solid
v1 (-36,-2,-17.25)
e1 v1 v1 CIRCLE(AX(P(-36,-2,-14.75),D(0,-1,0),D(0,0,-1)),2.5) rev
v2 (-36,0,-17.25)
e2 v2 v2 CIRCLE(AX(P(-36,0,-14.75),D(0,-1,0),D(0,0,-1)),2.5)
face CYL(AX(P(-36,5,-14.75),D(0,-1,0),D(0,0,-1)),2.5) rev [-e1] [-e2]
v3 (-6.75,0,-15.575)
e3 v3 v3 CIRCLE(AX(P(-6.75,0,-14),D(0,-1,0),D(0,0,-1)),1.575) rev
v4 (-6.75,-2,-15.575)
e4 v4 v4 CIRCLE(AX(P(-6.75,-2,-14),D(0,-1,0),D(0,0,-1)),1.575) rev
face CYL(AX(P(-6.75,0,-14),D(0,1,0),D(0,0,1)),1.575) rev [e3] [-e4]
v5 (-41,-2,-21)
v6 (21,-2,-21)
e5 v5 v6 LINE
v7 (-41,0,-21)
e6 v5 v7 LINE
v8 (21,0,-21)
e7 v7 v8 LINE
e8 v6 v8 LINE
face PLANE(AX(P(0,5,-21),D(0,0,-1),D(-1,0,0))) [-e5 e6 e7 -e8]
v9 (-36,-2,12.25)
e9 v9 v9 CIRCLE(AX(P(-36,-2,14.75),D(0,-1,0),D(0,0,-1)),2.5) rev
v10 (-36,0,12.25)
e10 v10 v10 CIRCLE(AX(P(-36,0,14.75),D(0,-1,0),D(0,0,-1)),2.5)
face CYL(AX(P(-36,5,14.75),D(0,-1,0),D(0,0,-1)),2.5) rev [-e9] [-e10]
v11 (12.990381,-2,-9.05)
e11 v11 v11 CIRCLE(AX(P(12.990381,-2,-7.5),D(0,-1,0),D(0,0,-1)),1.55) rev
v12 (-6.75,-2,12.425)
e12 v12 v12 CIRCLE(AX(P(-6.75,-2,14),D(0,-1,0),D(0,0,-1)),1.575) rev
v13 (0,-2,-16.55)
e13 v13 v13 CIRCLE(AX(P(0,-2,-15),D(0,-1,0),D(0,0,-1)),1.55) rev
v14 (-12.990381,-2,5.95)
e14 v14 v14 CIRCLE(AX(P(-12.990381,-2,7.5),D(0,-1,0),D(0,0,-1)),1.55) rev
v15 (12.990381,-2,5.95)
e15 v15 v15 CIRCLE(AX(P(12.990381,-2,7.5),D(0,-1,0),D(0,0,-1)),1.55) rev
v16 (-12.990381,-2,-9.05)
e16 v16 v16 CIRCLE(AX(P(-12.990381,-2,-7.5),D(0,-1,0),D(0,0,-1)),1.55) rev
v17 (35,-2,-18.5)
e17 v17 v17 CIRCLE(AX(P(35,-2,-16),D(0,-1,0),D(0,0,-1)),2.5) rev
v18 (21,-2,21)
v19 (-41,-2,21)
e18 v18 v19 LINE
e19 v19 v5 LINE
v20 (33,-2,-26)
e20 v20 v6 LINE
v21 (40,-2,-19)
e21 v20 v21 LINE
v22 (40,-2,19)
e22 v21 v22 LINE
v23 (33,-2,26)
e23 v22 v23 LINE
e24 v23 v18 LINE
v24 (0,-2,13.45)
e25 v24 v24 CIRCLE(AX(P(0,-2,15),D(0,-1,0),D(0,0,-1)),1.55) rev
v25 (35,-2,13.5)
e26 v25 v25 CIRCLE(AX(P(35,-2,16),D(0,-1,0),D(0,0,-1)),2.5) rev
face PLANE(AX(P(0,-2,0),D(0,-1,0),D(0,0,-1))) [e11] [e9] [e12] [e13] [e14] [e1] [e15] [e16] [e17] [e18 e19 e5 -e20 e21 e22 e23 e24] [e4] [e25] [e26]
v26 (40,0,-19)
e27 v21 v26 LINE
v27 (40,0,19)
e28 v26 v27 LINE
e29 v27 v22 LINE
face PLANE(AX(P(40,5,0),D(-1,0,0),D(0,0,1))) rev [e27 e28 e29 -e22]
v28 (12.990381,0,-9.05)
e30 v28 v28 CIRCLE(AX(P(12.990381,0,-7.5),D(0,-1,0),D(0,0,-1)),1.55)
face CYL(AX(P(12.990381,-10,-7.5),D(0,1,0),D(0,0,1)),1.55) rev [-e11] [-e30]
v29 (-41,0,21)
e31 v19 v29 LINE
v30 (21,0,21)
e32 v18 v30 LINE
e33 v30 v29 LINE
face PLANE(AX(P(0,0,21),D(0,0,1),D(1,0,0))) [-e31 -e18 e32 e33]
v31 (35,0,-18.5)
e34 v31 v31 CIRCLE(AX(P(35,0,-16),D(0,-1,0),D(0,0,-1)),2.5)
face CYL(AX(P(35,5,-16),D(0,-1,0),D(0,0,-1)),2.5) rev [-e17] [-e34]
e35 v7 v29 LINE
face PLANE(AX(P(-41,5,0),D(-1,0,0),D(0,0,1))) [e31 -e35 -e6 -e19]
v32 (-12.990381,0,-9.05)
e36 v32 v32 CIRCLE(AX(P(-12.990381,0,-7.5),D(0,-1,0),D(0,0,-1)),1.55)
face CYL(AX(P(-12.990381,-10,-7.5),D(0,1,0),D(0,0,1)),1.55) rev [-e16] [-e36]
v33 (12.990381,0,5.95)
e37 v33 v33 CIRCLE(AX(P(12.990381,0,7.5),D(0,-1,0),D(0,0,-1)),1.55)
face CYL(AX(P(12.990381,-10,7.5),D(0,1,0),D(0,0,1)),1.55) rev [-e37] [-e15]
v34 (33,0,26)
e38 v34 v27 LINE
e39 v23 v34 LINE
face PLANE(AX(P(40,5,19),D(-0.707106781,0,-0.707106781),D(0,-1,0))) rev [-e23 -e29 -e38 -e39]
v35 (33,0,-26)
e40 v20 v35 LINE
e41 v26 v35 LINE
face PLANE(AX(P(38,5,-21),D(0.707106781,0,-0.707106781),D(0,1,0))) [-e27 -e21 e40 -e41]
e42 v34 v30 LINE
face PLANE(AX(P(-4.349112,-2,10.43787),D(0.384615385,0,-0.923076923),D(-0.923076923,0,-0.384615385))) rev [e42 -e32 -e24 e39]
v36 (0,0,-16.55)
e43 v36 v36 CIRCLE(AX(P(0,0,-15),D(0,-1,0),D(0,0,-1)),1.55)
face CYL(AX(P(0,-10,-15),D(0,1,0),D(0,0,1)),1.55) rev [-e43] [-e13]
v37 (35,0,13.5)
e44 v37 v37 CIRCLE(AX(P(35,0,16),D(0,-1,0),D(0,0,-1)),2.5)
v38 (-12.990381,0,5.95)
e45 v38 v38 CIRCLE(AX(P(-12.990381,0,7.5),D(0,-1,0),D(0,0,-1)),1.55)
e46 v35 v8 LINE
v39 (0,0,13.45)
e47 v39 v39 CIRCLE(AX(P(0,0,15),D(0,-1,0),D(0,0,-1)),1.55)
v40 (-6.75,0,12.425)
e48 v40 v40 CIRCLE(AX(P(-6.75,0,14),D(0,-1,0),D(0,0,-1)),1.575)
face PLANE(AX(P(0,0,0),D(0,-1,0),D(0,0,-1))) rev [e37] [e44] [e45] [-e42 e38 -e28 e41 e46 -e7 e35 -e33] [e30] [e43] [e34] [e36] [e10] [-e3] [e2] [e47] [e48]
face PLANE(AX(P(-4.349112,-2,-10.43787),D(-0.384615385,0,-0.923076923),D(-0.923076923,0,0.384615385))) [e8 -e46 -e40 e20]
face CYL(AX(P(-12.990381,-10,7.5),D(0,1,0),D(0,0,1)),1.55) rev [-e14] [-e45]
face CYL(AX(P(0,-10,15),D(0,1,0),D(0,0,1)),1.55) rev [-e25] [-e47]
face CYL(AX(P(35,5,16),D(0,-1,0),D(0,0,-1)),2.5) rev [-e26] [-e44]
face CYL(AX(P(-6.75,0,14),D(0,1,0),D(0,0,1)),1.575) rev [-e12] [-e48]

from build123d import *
from build123d.topology import SkipClean

# Parameters (mm, degrees)
SKETCH_1_R          = 25
SKETCH_1_W          = 81
SKETCH_1_H          = 42
SKETCH_1_R_2        = 2.5
EXTRUDE_1_DEPTH     = 5
SKETCH_3_W          = 8.1
SKETCH_3_H          = 6.6
SKETCH_3_R          = 1.575
CUT_EXTRUDE_1_DEPTH = 2
SKETCH_3_2_R        = 1.575
CUT_EXTRUDE_2_DEPTH = 49.280430818
SKETCH_4_W          = 8
SKETCH_4_H          = 2.9
EXTRUDE_2_DEPTH     = 42
SKETCH_1_3_R        = 2.5
CUT_EXTRUDE_3_DEPTH = 42
EXTRUDE_START       = 21
SKETCH_5_W          = 11
SKETCH_5_H          = 2.9
EXTRUDE_3_DEPTH     = 5
SKETCH_5_W_2        = 12
EXTRUDE_3_2_DEPTH   = 5
CUT_EXTRUDE_4_REACH = 87.138
CHAMFER_1_SIZE      = 2
EXTRUDE_4_DEPTH     = 15
EXTRUDE_4_2_DEPTH   = 15
EXTRUDE_START_2     = -15
EXTRUDE_5_DEPTH     = 7.9
EXTRUDE_6_DEPTH     = 15
EXTRUDE_7_DEPTH     = 7.9
FILLET_1_R          = 5
SKETCH_12_R         = 2.5
SKETCH_12_R_2       = 1.575
EXTRUDE_8_DEPTH     = 2
SKETCH_13_W         = 180
SKETCH_13_H         = 120
CUT_EXTRUDE_5_DEPTH = 51.813384064
SKETCH_14_R         = 1.55
CUT_EXTRUDE_7_DEPTH = 10


# Read off the part's stored shape, not the designer's step: 凸台-拉伸7
with BuildPart() as part:
    # 草图1 → 凸台-拉伸1 (new body)
    # profile 1 of 2: a face of its own
    with BuildSketch(Plane(origin=(0, 0, 0), x_dir=(1, 0, 0), z_dir=(0, 1, 0))):
        Circle(SKETCH_1_R)
    # profile 2 of 2: a face of its own
    with BuildSketch(Plane(origin=(0, 0, 0), x_dir=(1, 0, 0), z_dir=(0, 1, 0))):
        with Locations((-0.5, 0)):
            Rectangle(SKETCH_1_W, SKETCH_1_H)
        with Locations(Location((35, 16, 0), (0, 0, 270))):
            Circle(SKETCH_1_R_2, mode=Mode.SUBTRACT)
        with Locations(Location((35, -16, 0), (0, 0, 270))):
            Circle(SKETCH_1_R_2, mode=Mode.SUBTRACT)
        with Locations(Location((-36, 14.75, 0), (0, 0, 270))):
            Circle(SKETCH_1_R_2, mode=Mode.SUBTRACT)
        with Locations(Location((-36, -14.75, 0), (0, 0, 270))):
            Circle(SKETCH_1_R_2, mode=Mode.SUBTRACT)
    extrude(amount=EXTRUDE_1_DEPTH)

    # 草图3 → 切除-拉伸1 (cut)
    # profile 1 of 2: a face of its own
    with BuildSketch(Plane(origin=(0, 5, 0), x_dir=(1, 0, 0), z_dir=(0, 1, 0))):
        with Locations((-6.75, -14)):
            Rectangle(SKETCH_3_W, SKETCH_3_H)
        with Locations(Location((-6.75, -14, 0), (0, 0, 90))):
            Circle(SKETCH_3_R, mode=Mode.SUBTRACT)
    # profile 2 of 2: a face of its own
    with BuildSketch(Plane(origin=(0, 5, 0), x_dir=(1, 0, 0), z_dir=(0, 1, 0))):
        with Locations((-6.75, 14)):
            Rectangle(SKETCH_3_W, SKETCH_3_H)
        with Locations(Location((-6.75, 14, 0), (0, 0, 270))):
            Circle(SKETCH_3_R, mode=Mode.SUBTRACT)
    extrude(amount=-CUT_EXTRUDE_1_DEPTH, mode=Mode.SUBTRACT)

    # 草图3<2> → 切除-拉伸2 (cut, through all)
    with BuildSketch(Plane(origin=(0, 5, 0), x_dir=(1, 0, 0), z_dir=(0, 1, 0))):
        with Locations(Location((-6.75, 14, 0), (0, 0, 270))):
            Circle(SKETCH_3_2_R)
        with Locations(Location((-6.75, -14, 0), (0, 0, 270))):
            Circle(SKETCH_3_2_R)
    extrude(amount=-CUT_EXTRUDE_2_DEPTH, mode=Mode.SUBTRACT)

    # 草图4 → 凸台-拉伸2 (add)
    with BuildSketch(Plane.XY.offset(21)):
        with Locations((36, 6.45)):
            Rectangle(SKETCH_4_W, SKETCH_4_H)
        with Locations((-37, 6.45)):
            Rectangle(SKETCH_4_W, SKETCH_4_H)
    extrude(amount=-EXTRUDE_2_DEPTH)

    # 草图1<3> → 切除-拉伸3 (cut)
    with BuildSketch(Plane(origin=(0, 0, 0), x_dir=(1, 0, 0), z_dir=(0, 1, 0))):
        with Locations(Location((35, 16, 0), (0, 0, 270))):
            Circle(SKETCH_1_3_R)
        with Locations(Location((35, -16, 0), (0, 0, 270))):
            Circle(SKETCH_1_3_R)
        with Locations(Location((-36, 14.75, 0), (0, 0, 180))):
            Circle(SKETCH_1_3_R)
        with Locations(Location((-36, -14.75, 0), (0, 0, 180))):
            Circle(SKETCH_1_3_R)
    extrude(amount=CUT_EXTRUDE_3_DEPTH, mode=Mode.SUBTRACT)


with BuildPart() as body_2:
    # 草图5 → 凸台-拉伸3 (new body)
    with BuildSketch(Plane.XY.offset(EXTRUDE_START)):
        with Locations((26.5, 6.45)):
            Rectangle(SKETCH_5_W, SKETCH_5_H)
    extrude_3 = extrude(amount=-EXTRUDE_3_DEPTH)


with BuildPart() as body_3:
    # 草图5 → Extrude 3 2 (new body)
    with BuildSketch(Plane.XY.offset(EXTRUDE_START)):
        with Locations((-27, 6.45)):
            Rectangle(SKETCH_5_W_2, SKETCH_5_H)
    extrude_3_2 = extrude(amount=-EXTRUDE_3_2_DEPTH)



with BuildPart() as part_1:
    add(part.part)

    # 镜向2: 凸台-拉伸3, Extrude 3 2 across plane
    add(extrude_3.mirror(Plane(origin=(0, 0, 0), x_dir=(1, 0, 0), z_dir=(0, 0, -1))))
    add(extrude_3_2.mirror(Plane(origin=(0, 0, 0), x_dir=(1, 0, 0), z_dir=(0, 0, -1))))

    # 切除-拉伸4: up to this face of the body (flat: up to its plane)
    cut_extrude_4_end = Plane(part_1.part.faces().sort_by_distance((32, 6.45, 2.5))[0])
    # 草图6 → 切除-拉伸4 (cut, up to the picked face)
    with BuildSketch(Plane.ZY.offset(41), mode=Mode.PRIVATE) as cut_extrude_4_sk1:
        with BuildLine():
            Line((11.041960784, 8.971428571), (-11.041960784, 8.971428571))
            ThreePointArc((-11.041960784, 8.971428571), (-8.690257734, 7.239234925), (-6.072727273, 5.943265655))
            ThreePointArc((-6.072727273, 5.943265655), (0, 4.8), (6.072727273, 5.943265655))
            ThreePointArc((6.072727273, 5.943265655), (8.690257734, 7.239234925), (11.041960784, 8.971428571))
        make_face()
    cut_extrude_4_tool1 = split(extrude(cut_extrude_4_sk1.sketch, amount=-CUT_EXTRUDE_4_REACH, mode=Mode.PRIVATE), bisect_by=cut_extrude_4_end, keep=Keep.BOTH, mode=Mode.PRIVATE)
    add(cut_extrude_4_tool1.solids().sort_by(Axis((-41, 7.283597, 0), (1, 0, 0)))[0], mode=Mode.SUBTRACT)

    # 倒角1
    chamfer_1_edges = [part_1.edges().sort_by_distance(p)[0] for p in [
        (-41, 3.95, 21),
        (-41, 3.95, -21),
        (40, 3.95, -21),
        (40, 3.95, 21),
    ]]
    chamfer(chamfer_1_edges, length=CHAMFER_1_SIZE)



with BuildPart() as body_4:
    # 草图9 → 凸台-拉伸4 (new body)
    with BuildSketch(Plane.XZ):
        with BuildLine():
            Line((33, 26), (23.72846392, 26))
            ThreePointArc((23.72846392, 26), (24.88485791, 24.895458357), (25.989891949, 23.739534884))
            ThreePointArc((25.989891949, 23.739534884), (27.687521221, 22.340851231), (29.708138181, 21.471732017))
            ThreePointArc((29.708138181, 21.471732017), (30.719571772, 21.268231436), (31.749015733, 21.2))
            Line((31.749015733, 21.2), (37.8, 21.2))
            Line((37.8, 21.2), (33, 26))
        make_face()
    extrude(amount=-EXTRUDE_4_DEPTH)


with BuildPart() as body_5:
    # 草图9 → Extrude 4 2 (new body)
    with BuildSketch(Plane.XZ):
        with BuildLine():
            Line((33, -26), (37.8, -21.2))
            Line((37.8, -21.2), (31.749015733, -21.2))
            ThreePointArc((31.749015733, -21.2), (30.719571772, -21.268231436), (29.708138181, -21.471732017))
            ThreePointArc((29.708138181, -21.471732017), (27.687521221, -22.340851231), (25.989891949, -23.739534884))
            ThreePointArc((25.989891949, -23.739534884), (24.88485791, -24.895458357), (23.72846392, -26))
            Line((23.72846392, -26), (33, -26))
        make_face()
    extrude(amount=-EXTRUDE_4_2_DEPTH)


with BuildPart() as part_2:
    add(part_1.part)

    add(body_4.part)  # 凸台-拉伸5 merges body 4
    # 草图10 → 凸台-拉伸5 (add)
    with BuildSketch(Plane(origin=(0, 15, 0), x_dir=(1, 0, 0), z_dir=(0, 1, 0)).offset(EXTRUDE_START_2)):
        with BuildLine():
            Line((21, -21), (23.72846392, -26))
            ThreePointArc((23.72846392, -26), (24.88485791, -24.895458357), (25.989891949, -23.739534884))
            ThreePointArc((25.989891949, -23.739534884), (28.601924052, -21.863066908), (31.749015733, -21.2))
            Line((31.749015733, -21.2), (37.8, -21.2))
            Line((37.8, -21.2), (38, -21))
            Line((38, -21), (32, -21))
            Line((32, -21), (21, -21))
        make_face()
    extrude_5 = extrude(amount=EXTRUDE_5_DEPTH)


with BuildPart() as body_3_1:
    add(body_3.part)

    add(part_2.part)  # 凸台-拉伸6 merges part
    # 草图11 → 凸台-拉伸6 (add)
    with BuildSketch(Plane.XZ.offset(EXTRUDE_START_2)):
        with BuildLine():
            Line((-41, 23), (-41, 20.45))
            Line((-41, 20.45), (-40.520827978, 20.45))
            ThreePointArc((-40.520827978, 20.45), (-40.024975712, 20.455165886), (-39.5293387, 20.4706613))
            Line((-39.5293387, 20.4706613), (-39, 21))
            Line((-39, 21), (-35.43383476, 21))
            ThreePointArc((-35.43383476, 21), (-31.171725667, 22.363148102), (-27.240108871, 24.5))
            Line((-27.240108871, 24.5), (-41, 24.5))
            Line((-41, 24.5), (-41, 23))
        make_face()
        with BuildLine():
            Line((-39, 21), (-39.5293387, 20.4706613))
            ThreePointArc((-39.5293387, 20.4706613), (-39.301113021, 20.481274846), (-39.072999743, 20.494078772))
            ThreePointArc((-39.072999743, 20.494078772), (-38.358018151, 20.54847571), (-37.644999743, 20.624386527))
            ThreePointArc((-37.644999743, 20.624386527), (-36.534990206, 20.786132091), (-35.43383476, 21))
            Line((-35.43383476, 21), (-39, 21))
        make_face()
    extrude_6 = extrude(amount=EXTRUDE_6_DEPTH)

    # 凸台-拉伸7 outline → 凸台-拉伸7 (add)
    with BuildSketch(Plane(origin=(0, 0, 0), x_dir=(1, 0, 0), z_dir=(0, 1, 0))):
        with BuildLine():
            Line((-39.5293387, -20.4706613), (-41, -19))
            Line((-41, -19), (-41, -20.45))
            Line((-41, -20.45), (-40.520827978, -20.45))
            ThreePointArc((-40.520827978, -20.45), (-40.024975712, -20.455165886), (-39.5293387, -20.4706613))
        make_face()
        with BuildLine():
            Line((-21, -21), (-35.43383476, -21))
            ThreePointArc((-35.43383476, -21), (-31.171725667, -22.363148102), (-27.240108871, -24.5))
            Line((-27.240108871, -24.5), (-21, -21))
        make_face()
    extrude_7 = extrude(amount=EXTRUDE_7_DEPTH)

    # 镜向3: 凸台-拉伸5, 凸台-拉伸6, 凸台-拉伸7 across plane
    add(extrude_5.mirror(Plane(origin=(0, 0, 0), x_dir=(1, 0, 0), z_dir=(0, 0, -1))))
    add(extrude_6.mirror(Plane(origin=(0, 0, 0), x_dir=(1, 0, 0), z_dir=(0, 0, -1))))
    add(extrude_7.mirror(Plane(origin=(0, 0, 0), x_dir=(1, 0, 0), z_dir=(0, 0, -1))))


with BuildPart() as body_2_1:
    add(body_2.part)

    # Combine 1: union body 3, body 5
    add(body_3_1.part)
    add(body_5.part)

    # 圆角1
    fillet_1_edges = [body_2_1.edges().sort_by_distance(p)[0] for p in [
        (32, 6.45, 16),
        (-33, 6.45, 16),
        (-33, 6.45, -16),
        (32, 6.45, -16),
    ]]
    fillet(fillet_1_edges, radius=FILLET_1_R)

    # 草图12 → 凸台-拉伸8 (add)
    with SkipClean():  # the faces are left unmerged after this step: merging them gives an invalid solid
        with BuildSketch(Plane.XZ):
            Polygon((13.564659966, 21), (-13.564659966, 21), (-21, 21), (-41, 21), (-41, -21), (-21, -21), (-13.564659966, -21), (13.564659966, -21), (21, -21), (33, -26), (40, -19), (40, 19), (33, 26), (21, 21), align=None)
            with Locations((-36, -14.75)):
                Circle(SKETCH_12_R, mode=Mode.SUBTRACT)
            with Locations((-6.75, -14)):
                Circle(SKETCH_12_R_2, mode=Mode.SUBTRACT)
            with Locations((35, -16)):
                Circle(SKETCH_12_R, mode=Mode.SUBTRACT)
            with Locations((-36, 14.75)):
                Circle(SKETCH_12_R, mode=Mode.SUBTRACT)
            with Locations((-6.75, 14)):
                Circle(SKETCH_12_R_2, mode=Mode.SUBTRACT)
            with Locations((35, 16)):
                Circle(SKETCH_12_R, mode=Mode.SUBTRACT)
        extrude(amount=EXTRUDE_8_DEPTH)

    # 草图13 → 切除-拉伸5 (cut, through all)
    with BuildSketch(Plane.XZ):
        with Locations((-41, 24.5)):
            Rectangle(SKETCH_13_W, SKETCH_13_H)
    extrude(amount=-CUT_EXTRUDE_5_DEPTH, mode=Mode.SUBTRACT)

    # 草图14 → 切除-拉伸7 (cut)
    with BuildSketch(Plane.XZ):
        with Locations(Location((12.990381057, 7.5, 0), (0, 0, 270))):
            Circle(SKETCH_14_R)
        with Locations(Location((12.990381057, -7.5, 0), (0, 0, 270))):
            Circle(SKETCH_14_R)
        with Locations(Location((0, -15, 0), (0, 0, 270))):
            Circle(SKETCH_14_R)
        with Locations(Location((-12.990381057, -7.5, 0), (0, 0, 270))):
            Circle(SKETCH_14_R)
        with Locations(Location((-12.990381057, 7.5, 0), (0, 0, 270))):
            Circle(SKETCH_14_R)
        with Locations(Location((0, 15, 0), (0, 0, 270))):
            Circle(SKETCH_14_R)
    extrude(amount=CUT_EXTRUDE_7_DEPTH, mode=Mode.SUBTRACT)


solid = body_2_1.part
